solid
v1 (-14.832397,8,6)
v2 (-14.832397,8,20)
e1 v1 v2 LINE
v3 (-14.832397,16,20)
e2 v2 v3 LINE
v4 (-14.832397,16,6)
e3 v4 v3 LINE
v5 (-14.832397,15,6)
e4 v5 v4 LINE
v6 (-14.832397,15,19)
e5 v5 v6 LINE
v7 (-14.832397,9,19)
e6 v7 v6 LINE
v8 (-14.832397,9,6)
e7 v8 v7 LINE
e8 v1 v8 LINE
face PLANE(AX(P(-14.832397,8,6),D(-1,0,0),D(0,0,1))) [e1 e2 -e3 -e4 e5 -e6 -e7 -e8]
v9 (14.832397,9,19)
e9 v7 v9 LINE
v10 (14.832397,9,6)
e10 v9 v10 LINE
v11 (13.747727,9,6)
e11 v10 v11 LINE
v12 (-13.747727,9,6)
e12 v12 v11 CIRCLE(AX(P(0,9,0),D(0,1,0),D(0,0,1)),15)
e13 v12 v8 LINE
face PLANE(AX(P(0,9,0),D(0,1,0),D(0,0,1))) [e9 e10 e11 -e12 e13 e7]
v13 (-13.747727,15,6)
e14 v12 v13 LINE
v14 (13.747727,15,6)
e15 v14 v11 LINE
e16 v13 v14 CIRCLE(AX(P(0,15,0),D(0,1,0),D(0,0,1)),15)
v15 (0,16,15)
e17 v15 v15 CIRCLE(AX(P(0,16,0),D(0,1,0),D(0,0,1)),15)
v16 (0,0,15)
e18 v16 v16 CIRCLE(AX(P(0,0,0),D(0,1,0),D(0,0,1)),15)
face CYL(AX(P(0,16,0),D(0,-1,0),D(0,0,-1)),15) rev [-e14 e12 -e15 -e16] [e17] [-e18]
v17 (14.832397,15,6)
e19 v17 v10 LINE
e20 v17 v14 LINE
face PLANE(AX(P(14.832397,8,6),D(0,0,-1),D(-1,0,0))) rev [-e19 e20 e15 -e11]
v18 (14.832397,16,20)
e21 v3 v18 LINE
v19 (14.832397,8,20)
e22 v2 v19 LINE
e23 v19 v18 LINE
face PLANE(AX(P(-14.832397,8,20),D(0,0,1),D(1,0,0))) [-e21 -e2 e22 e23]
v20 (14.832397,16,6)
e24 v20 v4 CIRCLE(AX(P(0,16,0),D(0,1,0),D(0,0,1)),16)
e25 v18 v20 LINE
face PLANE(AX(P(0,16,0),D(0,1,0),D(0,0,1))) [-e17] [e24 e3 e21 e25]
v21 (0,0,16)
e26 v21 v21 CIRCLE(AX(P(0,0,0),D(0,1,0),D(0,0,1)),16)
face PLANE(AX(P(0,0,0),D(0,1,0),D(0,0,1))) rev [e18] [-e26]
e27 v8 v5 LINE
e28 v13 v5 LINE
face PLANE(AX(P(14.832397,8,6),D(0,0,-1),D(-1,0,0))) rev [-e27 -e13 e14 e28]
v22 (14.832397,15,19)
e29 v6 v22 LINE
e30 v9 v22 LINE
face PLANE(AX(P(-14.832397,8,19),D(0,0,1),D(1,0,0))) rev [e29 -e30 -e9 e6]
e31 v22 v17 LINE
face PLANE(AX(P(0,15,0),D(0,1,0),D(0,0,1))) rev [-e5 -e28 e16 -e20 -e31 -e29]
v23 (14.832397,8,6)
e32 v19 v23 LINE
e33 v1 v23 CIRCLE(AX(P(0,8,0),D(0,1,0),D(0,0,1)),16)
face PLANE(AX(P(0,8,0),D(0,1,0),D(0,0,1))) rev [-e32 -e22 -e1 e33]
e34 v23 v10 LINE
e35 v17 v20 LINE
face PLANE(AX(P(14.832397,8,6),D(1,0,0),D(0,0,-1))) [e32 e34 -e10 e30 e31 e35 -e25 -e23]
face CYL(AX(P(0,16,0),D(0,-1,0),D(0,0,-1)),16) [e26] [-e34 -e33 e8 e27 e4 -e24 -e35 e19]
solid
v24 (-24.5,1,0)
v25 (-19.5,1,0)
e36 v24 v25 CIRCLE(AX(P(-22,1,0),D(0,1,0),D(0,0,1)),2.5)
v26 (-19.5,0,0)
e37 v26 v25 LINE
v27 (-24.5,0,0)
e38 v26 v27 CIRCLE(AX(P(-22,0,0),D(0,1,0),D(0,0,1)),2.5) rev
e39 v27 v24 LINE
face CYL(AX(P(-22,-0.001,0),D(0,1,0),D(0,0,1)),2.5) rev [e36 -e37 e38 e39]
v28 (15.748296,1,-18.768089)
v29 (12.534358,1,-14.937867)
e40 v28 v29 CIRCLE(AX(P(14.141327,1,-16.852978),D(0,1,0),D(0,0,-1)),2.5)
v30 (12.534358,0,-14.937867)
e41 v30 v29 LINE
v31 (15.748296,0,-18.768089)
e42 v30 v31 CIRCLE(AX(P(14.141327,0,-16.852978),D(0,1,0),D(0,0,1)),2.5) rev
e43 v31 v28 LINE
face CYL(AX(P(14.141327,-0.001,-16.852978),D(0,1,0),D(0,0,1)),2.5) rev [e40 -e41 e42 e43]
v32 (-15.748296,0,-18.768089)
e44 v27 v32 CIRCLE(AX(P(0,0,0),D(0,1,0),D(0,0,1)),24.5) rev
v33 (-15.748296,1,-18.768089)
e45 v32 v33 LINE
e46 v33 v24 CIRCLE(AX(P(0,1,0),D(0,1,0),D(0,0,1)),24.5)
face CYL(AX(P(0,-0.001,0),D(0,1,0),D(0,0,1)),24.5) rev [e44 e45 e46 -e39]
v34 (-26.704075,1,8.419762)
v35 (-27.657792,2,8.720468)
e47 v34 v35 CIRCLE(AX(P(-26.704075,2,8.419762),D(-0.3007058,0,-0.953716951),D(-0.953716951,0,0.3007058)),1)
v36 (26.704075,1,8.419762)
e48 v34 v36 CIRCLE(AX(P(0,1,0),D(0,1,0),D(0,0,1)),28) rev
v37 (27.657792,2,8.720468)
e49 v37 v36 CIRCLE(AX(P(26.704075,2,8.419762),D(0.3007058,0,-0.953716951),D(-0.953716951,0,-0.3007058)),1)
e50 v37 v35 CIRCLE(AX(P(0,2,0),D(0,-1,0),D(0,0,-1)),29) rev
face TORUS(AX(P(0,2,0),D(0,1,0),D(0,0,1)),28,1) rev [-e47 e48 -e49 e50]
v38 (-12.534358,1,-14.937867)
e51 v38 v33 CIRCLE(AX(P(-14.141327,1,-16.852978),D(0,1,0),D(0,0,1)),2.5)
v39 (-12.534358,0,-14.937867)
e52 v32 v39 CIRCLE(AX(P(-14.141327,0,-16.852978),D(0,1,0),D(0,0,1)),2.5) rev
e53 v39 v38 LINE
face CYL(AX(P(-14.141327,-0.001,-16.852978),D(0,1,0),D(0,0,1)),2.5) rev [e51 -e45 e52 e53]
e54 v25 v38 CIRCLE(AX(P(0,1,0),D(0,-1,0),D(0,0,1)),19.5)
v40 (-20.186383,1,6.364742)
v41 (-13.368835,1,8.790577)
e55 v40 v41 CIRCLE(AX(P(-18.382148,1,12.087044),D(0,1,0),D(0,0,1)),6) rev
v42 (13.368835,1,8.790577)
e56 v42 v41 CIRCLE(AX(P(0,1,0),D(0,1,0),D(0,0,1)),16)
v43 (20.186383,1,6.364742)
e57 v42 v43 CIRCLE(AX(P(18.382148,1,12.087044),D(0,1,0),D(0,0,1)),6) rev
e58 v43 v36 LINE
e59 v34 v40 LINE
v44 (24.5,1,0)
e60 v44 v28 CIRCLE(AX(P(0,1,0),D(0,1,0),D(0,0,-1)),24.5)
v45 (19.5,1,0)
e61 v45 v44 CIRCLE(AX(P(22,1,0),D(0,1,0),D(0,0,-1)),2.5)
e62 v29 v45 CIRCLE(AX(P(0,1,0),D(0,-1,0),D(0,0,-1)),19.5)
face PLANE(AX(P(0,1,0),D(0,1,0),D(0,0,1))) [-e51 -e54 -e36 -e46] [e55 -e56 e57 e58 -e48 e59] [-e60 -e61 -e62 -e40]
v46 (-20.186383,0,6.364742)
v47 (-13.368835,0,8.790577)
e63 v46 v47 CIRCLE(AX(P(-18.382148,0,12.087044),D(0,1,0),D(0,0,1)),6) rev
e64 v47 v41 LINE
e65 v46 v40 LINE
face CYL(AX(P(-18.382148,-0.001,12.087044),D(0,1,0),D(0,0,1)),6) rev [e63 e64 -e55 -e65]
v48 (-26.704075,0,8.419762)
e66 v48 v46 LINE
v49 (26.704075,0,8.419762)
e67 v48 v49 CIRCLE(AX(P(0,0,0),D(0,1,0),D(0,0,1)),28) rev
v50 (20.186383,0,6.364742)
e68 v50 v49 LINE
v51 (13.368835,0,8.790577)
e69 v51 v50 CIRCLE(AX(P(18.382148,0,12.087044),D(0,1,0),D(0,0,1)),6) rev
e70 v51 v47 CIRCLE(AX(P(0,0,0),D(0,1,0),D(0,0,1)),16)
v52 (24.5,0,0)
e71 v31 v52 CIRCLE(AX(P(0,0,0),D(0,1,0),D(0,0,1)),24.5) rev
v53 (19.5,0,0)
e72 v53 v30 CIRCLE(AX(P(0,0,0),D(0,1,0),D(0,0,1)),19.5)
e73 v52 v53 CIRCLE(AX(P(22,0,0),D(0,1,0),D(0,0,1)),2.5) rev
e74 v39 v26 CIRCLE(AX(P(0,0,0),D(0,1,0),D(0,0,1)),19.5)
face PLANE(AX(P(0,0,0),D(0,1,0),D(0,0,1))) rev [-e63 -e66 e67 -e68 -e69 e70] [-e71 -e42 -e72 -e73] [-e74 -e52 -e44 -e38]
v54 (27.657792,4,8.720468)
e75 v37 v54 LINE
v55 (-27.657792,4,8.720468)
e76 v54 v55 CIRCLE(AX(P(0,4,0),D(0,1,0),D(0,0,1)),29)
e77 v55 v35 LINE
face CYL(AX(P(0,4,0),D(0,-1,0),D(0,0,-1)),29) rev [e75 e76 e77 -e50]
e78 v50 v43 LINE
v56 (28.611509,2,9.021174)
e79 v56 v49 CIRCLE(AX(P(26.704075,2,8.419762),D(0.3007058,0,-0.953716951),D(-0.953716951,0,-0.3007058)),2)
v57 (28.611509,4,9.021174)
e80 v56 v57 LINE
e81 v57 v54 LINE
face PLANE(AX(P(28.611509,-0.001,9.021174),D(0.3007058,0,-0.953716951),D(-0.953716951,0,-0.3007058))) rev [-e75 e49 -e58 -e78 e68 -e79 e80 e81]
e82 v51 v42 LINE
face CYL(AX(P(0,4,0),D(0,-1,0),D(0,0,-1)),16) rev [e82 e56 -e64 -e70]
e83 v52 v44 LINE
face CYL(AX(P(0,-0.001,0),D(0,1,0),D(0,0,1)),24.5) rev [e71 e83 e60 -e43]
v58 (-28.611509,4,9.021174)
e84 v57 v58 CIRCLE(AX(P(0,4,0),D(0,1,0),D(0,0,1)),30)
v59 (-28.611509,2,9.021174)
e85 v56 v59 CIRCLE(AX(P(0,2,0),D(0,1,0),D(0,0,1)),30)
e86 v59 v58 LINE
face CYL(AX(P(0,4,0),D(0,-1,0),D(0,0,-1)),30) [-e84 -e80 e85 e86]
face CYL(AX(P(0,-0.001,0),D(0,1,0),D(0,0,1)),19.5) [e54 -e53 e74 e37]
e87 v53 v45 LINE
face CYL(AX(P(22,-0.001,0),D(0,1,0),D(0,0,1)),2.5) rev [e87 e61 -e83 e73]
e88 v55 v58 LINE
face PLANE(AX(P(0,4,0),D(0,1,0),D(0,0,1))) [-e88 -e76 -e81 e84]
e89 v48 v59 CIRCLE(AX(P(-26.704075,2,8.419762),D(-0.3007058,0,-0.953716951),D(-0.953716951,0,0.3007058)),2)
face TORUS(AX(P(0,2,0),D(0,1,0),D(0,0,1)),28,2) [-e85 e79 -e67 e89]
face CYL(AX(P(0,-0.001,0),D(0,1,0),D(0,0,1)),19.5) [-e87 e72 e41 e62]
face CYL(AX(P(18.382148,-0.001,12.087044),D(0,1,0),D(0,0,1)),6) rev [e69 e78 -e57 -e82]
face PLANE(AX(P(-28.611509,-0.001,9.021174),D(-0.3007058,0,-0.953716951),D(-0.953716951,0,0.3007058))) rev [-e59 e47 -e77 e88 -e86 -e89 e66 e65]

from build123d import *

# Parameters (mm, degrees)
SKETCH_1_R               = 30
SKETCH_1_R_2             = 16
EXTRUDE_1_DEPTH          = 4
FILLET_1_R               = 2
SHELL_12_T               = -1
EXTRUDE_7_DEPTH          = 16
CUT_EXTRUDE_START        = -4
SKETCH_7_R               = 16
CUT_EXTRUDE_5_DEPTH      = 4
CUT_EXTRUDE_6_DEPTH      = 1
SHELL_15_T               = -1
SKETCH_9_W               = 29.664793948
SKETCH_9_H               = 14
EXTRUDE_8_DEPTH          = 8
SHELL_START              = 6
SHELL_16_OUTLINE_W       = 29.664793948
SHELL_16_OUTLINE_H       = 6
SHELL_16_DEPTH           = 13
CUT_EXTRUDE_9_DEPTH      = 46.000000133
CUT_EXTRUDE_9_DEPTH_BACK = 46.000000133
SKETCH_10_R              = 15


# Read off the part's stored shape, not the designer's step: 抽壳16
with BuildPart() as part:
    # 草图1 → 凸台-拉伸1 (new body)
    with BuildSketch(Plane(origin=(0, 0, 0), x_dir=(1, 0, 0), z_dir=(0, 1, 0))):
        with Locations(Location((0, 0, 0), (0, 0, 270))):
            Circle(SKETCH_1_R)
        with Locations(Location((0, 0, 0), (0, 0, 270))):
            Circle(SKETCH_1_R_2, mode=Mode.SUBTRACT)
    extrude(amount=EXTRUDE_1_DEPTH)

    # 圆角1
    fillet_1_edges = [part.edges().sort_by_distance(p)[0] for p in [
        (0, 0, -30),
    ]]
    fillet(fillet_1_edges, radius=FILLET_1_R)

    # 抽壳12
    shell_12_openings = [part.faces().sort_by_distance(p)[0] for p in [
        (0, 4, -29.151471863),
        (0, 2, -16),
    ]]
    offset(amount=SHELL_12_T, openings=shell_12_openings, kind=Kind.INTERSECTION)

    # 草图7 → 切除-拉伸5 (cut)
    with BuildSketch(Plane(origin=(0, 4, 0), x_dir=(1, 0, 0), z_dir=(0, 1, 0)).offset(CUT_EXTRUDE_START)):
        with Locations(Location((0, 0, 0), (0, 0, 270))):
            Circle(SKETCH_7_R)
        with BuildLine():
            Line((-28.611508522, -9.021173985), (-20.186382983, -6.364742106))
            ThreePointArc((-20.186382983, -6.364742106), (-16.370751886, -6.434231685), (-13.368835044, -8.790577317))
            ThreePointArc((-13.368835044, -8.790577317), (0, -16), (13.368835044, -8.790577317))
            ThreePointArc((13.368835044, -8.790577317), (16.370751886, -6.434231685), (20.186382983, -6.364742106))
            Line((20.186382983, -6.364742106), (28.611508522, -9.021173985))
            ThreePointArc((28.611508522, -9.021173985), (0, -30), (-28.611508522, -9.021173985))
        make_face()
    extrude(amount=CUT_EXTRUDE_5_DEPTH, mode=Mode.SUBTRACT)

    # 草图8 → 切除-拉伸6 (cut)
    with BuildSketch(Plane(origin=(0, 1, 0), x_dir=(1, 0, 0), z_dir=(0, 1, 0))):
        with BuildLine():
            ThreePointArc((-15.748296437, 18.768088856), (-22.204540782, 10.354147413), (-24.5, 0))
            ThreePointArc((-24.5, 0), (-22, -2.5), (-19.5, 0))
            ThreePointArc((-19.5, 0), (-17.673001847, 8.241056104), (-12.534358389, 14.937866641))
            ThreePointArc((-12.534358389, 14.937866641), (-12.226216305, 18.459946773), (-15.748296437, 18.768088856))
        make_face()
        with BuildLine():
            ThreePointArc((15.748296437, 18.768088856), (22.204540782, 10.354147413), (24.5, 0))
            ThreePointArc((24.5, 0), (22, -2.5), (19.5, 0))
            ThreePointArc((19.5, 0), (17.673001847, 8.241056104), (12.534358389, 14.937866641))
            ThreePointArc((12.534358389, 14.937866641), (12.226216305, 18.459946773), (15.748296437, 18.768088856))
        make_face()
    extrude(amount=-CUT_EXTRUDE_6_DEPTH, mode=Mode.SUBTRACT)


with BuildPart() as body_2:
    # 草图1<8> → 凸台-拉伸7 (new body)
    with BuildSketch(Plane(origin=(0, 0, 0), x_dir=(1, 0, 0), z_dir=(0, 1, 0))):
        with BuildLine():
            ThreePointArc((16, 0), (11.313708499, 11.313708499), (0, 16))
            Line((0, 16), (0, -16))
            ThreePointArc((0, -16), (11.313708499, -11.313708499), (16, 0))
        make_face()
        with BuildLine():
            Line((0, -16), (0, 16))
            ThreePointArc((0, 16), (-16, 0), (0, -16))
        make_face()
    extrude(amount=EXTRUDE_7_DEPTH)

    # 抽壳15
    shell_15_openings = [body_2.faces().sort_by_distance(p)[0] for p in [
        (0, 16, 0),
    ]]
    offset(amount=SHELL_15_T, openings=shell_15_openings, kind=Kind.INTERSECTION)

    # 草图9 → 凸台-拉伸8 (add)
    with BuildSketch(Plane(origin=(0, 16, 0), x_dir=(1, 0, 0), z_dir=(0, 1, 0))):
        with Locations((0, -13)):
            Rectangle(SKETCH_9_W, SKETCH_9_H)
    extrude(amount=-EXTRUDE_8_DEPTH)

    # 抽壳16 outline → 抽壳16 (cut)
    with BuildSketch(Plane.XY.offset(SHELL_START)):
        with Locations((0, 12)):
            Rectangle(SHELL_16_OUTLINE_W, SHELL_16_OUTLINE_H)
    extrude(amount=SHELL_16_DEPTH, mode=Mode.SUBTRACT)

    # 草图10 → 切除-拉伸9 (cut, two sides: drawn at the far end of the back side and taken through both)
    with BuildSketch(Plane(origin=(0, 1, 0), x_dir=(1, 0, 0), z_dir=(0, 1, 0)).offset(-CUT_EXTRUDE_9_DEPTH_BACK)):
        with Locations(Location((0, 0, 0), (0, 0, 270))):
            Circle(SKETCH_10_R)
    extrude(amount=CUT_EXTRUDE_9_DEPTH + CUT_EXTRUDE_9_DEPTH_BACK, mode=Mode.SUBTRACT)


solid = Compound([part.part, body_2.part])
